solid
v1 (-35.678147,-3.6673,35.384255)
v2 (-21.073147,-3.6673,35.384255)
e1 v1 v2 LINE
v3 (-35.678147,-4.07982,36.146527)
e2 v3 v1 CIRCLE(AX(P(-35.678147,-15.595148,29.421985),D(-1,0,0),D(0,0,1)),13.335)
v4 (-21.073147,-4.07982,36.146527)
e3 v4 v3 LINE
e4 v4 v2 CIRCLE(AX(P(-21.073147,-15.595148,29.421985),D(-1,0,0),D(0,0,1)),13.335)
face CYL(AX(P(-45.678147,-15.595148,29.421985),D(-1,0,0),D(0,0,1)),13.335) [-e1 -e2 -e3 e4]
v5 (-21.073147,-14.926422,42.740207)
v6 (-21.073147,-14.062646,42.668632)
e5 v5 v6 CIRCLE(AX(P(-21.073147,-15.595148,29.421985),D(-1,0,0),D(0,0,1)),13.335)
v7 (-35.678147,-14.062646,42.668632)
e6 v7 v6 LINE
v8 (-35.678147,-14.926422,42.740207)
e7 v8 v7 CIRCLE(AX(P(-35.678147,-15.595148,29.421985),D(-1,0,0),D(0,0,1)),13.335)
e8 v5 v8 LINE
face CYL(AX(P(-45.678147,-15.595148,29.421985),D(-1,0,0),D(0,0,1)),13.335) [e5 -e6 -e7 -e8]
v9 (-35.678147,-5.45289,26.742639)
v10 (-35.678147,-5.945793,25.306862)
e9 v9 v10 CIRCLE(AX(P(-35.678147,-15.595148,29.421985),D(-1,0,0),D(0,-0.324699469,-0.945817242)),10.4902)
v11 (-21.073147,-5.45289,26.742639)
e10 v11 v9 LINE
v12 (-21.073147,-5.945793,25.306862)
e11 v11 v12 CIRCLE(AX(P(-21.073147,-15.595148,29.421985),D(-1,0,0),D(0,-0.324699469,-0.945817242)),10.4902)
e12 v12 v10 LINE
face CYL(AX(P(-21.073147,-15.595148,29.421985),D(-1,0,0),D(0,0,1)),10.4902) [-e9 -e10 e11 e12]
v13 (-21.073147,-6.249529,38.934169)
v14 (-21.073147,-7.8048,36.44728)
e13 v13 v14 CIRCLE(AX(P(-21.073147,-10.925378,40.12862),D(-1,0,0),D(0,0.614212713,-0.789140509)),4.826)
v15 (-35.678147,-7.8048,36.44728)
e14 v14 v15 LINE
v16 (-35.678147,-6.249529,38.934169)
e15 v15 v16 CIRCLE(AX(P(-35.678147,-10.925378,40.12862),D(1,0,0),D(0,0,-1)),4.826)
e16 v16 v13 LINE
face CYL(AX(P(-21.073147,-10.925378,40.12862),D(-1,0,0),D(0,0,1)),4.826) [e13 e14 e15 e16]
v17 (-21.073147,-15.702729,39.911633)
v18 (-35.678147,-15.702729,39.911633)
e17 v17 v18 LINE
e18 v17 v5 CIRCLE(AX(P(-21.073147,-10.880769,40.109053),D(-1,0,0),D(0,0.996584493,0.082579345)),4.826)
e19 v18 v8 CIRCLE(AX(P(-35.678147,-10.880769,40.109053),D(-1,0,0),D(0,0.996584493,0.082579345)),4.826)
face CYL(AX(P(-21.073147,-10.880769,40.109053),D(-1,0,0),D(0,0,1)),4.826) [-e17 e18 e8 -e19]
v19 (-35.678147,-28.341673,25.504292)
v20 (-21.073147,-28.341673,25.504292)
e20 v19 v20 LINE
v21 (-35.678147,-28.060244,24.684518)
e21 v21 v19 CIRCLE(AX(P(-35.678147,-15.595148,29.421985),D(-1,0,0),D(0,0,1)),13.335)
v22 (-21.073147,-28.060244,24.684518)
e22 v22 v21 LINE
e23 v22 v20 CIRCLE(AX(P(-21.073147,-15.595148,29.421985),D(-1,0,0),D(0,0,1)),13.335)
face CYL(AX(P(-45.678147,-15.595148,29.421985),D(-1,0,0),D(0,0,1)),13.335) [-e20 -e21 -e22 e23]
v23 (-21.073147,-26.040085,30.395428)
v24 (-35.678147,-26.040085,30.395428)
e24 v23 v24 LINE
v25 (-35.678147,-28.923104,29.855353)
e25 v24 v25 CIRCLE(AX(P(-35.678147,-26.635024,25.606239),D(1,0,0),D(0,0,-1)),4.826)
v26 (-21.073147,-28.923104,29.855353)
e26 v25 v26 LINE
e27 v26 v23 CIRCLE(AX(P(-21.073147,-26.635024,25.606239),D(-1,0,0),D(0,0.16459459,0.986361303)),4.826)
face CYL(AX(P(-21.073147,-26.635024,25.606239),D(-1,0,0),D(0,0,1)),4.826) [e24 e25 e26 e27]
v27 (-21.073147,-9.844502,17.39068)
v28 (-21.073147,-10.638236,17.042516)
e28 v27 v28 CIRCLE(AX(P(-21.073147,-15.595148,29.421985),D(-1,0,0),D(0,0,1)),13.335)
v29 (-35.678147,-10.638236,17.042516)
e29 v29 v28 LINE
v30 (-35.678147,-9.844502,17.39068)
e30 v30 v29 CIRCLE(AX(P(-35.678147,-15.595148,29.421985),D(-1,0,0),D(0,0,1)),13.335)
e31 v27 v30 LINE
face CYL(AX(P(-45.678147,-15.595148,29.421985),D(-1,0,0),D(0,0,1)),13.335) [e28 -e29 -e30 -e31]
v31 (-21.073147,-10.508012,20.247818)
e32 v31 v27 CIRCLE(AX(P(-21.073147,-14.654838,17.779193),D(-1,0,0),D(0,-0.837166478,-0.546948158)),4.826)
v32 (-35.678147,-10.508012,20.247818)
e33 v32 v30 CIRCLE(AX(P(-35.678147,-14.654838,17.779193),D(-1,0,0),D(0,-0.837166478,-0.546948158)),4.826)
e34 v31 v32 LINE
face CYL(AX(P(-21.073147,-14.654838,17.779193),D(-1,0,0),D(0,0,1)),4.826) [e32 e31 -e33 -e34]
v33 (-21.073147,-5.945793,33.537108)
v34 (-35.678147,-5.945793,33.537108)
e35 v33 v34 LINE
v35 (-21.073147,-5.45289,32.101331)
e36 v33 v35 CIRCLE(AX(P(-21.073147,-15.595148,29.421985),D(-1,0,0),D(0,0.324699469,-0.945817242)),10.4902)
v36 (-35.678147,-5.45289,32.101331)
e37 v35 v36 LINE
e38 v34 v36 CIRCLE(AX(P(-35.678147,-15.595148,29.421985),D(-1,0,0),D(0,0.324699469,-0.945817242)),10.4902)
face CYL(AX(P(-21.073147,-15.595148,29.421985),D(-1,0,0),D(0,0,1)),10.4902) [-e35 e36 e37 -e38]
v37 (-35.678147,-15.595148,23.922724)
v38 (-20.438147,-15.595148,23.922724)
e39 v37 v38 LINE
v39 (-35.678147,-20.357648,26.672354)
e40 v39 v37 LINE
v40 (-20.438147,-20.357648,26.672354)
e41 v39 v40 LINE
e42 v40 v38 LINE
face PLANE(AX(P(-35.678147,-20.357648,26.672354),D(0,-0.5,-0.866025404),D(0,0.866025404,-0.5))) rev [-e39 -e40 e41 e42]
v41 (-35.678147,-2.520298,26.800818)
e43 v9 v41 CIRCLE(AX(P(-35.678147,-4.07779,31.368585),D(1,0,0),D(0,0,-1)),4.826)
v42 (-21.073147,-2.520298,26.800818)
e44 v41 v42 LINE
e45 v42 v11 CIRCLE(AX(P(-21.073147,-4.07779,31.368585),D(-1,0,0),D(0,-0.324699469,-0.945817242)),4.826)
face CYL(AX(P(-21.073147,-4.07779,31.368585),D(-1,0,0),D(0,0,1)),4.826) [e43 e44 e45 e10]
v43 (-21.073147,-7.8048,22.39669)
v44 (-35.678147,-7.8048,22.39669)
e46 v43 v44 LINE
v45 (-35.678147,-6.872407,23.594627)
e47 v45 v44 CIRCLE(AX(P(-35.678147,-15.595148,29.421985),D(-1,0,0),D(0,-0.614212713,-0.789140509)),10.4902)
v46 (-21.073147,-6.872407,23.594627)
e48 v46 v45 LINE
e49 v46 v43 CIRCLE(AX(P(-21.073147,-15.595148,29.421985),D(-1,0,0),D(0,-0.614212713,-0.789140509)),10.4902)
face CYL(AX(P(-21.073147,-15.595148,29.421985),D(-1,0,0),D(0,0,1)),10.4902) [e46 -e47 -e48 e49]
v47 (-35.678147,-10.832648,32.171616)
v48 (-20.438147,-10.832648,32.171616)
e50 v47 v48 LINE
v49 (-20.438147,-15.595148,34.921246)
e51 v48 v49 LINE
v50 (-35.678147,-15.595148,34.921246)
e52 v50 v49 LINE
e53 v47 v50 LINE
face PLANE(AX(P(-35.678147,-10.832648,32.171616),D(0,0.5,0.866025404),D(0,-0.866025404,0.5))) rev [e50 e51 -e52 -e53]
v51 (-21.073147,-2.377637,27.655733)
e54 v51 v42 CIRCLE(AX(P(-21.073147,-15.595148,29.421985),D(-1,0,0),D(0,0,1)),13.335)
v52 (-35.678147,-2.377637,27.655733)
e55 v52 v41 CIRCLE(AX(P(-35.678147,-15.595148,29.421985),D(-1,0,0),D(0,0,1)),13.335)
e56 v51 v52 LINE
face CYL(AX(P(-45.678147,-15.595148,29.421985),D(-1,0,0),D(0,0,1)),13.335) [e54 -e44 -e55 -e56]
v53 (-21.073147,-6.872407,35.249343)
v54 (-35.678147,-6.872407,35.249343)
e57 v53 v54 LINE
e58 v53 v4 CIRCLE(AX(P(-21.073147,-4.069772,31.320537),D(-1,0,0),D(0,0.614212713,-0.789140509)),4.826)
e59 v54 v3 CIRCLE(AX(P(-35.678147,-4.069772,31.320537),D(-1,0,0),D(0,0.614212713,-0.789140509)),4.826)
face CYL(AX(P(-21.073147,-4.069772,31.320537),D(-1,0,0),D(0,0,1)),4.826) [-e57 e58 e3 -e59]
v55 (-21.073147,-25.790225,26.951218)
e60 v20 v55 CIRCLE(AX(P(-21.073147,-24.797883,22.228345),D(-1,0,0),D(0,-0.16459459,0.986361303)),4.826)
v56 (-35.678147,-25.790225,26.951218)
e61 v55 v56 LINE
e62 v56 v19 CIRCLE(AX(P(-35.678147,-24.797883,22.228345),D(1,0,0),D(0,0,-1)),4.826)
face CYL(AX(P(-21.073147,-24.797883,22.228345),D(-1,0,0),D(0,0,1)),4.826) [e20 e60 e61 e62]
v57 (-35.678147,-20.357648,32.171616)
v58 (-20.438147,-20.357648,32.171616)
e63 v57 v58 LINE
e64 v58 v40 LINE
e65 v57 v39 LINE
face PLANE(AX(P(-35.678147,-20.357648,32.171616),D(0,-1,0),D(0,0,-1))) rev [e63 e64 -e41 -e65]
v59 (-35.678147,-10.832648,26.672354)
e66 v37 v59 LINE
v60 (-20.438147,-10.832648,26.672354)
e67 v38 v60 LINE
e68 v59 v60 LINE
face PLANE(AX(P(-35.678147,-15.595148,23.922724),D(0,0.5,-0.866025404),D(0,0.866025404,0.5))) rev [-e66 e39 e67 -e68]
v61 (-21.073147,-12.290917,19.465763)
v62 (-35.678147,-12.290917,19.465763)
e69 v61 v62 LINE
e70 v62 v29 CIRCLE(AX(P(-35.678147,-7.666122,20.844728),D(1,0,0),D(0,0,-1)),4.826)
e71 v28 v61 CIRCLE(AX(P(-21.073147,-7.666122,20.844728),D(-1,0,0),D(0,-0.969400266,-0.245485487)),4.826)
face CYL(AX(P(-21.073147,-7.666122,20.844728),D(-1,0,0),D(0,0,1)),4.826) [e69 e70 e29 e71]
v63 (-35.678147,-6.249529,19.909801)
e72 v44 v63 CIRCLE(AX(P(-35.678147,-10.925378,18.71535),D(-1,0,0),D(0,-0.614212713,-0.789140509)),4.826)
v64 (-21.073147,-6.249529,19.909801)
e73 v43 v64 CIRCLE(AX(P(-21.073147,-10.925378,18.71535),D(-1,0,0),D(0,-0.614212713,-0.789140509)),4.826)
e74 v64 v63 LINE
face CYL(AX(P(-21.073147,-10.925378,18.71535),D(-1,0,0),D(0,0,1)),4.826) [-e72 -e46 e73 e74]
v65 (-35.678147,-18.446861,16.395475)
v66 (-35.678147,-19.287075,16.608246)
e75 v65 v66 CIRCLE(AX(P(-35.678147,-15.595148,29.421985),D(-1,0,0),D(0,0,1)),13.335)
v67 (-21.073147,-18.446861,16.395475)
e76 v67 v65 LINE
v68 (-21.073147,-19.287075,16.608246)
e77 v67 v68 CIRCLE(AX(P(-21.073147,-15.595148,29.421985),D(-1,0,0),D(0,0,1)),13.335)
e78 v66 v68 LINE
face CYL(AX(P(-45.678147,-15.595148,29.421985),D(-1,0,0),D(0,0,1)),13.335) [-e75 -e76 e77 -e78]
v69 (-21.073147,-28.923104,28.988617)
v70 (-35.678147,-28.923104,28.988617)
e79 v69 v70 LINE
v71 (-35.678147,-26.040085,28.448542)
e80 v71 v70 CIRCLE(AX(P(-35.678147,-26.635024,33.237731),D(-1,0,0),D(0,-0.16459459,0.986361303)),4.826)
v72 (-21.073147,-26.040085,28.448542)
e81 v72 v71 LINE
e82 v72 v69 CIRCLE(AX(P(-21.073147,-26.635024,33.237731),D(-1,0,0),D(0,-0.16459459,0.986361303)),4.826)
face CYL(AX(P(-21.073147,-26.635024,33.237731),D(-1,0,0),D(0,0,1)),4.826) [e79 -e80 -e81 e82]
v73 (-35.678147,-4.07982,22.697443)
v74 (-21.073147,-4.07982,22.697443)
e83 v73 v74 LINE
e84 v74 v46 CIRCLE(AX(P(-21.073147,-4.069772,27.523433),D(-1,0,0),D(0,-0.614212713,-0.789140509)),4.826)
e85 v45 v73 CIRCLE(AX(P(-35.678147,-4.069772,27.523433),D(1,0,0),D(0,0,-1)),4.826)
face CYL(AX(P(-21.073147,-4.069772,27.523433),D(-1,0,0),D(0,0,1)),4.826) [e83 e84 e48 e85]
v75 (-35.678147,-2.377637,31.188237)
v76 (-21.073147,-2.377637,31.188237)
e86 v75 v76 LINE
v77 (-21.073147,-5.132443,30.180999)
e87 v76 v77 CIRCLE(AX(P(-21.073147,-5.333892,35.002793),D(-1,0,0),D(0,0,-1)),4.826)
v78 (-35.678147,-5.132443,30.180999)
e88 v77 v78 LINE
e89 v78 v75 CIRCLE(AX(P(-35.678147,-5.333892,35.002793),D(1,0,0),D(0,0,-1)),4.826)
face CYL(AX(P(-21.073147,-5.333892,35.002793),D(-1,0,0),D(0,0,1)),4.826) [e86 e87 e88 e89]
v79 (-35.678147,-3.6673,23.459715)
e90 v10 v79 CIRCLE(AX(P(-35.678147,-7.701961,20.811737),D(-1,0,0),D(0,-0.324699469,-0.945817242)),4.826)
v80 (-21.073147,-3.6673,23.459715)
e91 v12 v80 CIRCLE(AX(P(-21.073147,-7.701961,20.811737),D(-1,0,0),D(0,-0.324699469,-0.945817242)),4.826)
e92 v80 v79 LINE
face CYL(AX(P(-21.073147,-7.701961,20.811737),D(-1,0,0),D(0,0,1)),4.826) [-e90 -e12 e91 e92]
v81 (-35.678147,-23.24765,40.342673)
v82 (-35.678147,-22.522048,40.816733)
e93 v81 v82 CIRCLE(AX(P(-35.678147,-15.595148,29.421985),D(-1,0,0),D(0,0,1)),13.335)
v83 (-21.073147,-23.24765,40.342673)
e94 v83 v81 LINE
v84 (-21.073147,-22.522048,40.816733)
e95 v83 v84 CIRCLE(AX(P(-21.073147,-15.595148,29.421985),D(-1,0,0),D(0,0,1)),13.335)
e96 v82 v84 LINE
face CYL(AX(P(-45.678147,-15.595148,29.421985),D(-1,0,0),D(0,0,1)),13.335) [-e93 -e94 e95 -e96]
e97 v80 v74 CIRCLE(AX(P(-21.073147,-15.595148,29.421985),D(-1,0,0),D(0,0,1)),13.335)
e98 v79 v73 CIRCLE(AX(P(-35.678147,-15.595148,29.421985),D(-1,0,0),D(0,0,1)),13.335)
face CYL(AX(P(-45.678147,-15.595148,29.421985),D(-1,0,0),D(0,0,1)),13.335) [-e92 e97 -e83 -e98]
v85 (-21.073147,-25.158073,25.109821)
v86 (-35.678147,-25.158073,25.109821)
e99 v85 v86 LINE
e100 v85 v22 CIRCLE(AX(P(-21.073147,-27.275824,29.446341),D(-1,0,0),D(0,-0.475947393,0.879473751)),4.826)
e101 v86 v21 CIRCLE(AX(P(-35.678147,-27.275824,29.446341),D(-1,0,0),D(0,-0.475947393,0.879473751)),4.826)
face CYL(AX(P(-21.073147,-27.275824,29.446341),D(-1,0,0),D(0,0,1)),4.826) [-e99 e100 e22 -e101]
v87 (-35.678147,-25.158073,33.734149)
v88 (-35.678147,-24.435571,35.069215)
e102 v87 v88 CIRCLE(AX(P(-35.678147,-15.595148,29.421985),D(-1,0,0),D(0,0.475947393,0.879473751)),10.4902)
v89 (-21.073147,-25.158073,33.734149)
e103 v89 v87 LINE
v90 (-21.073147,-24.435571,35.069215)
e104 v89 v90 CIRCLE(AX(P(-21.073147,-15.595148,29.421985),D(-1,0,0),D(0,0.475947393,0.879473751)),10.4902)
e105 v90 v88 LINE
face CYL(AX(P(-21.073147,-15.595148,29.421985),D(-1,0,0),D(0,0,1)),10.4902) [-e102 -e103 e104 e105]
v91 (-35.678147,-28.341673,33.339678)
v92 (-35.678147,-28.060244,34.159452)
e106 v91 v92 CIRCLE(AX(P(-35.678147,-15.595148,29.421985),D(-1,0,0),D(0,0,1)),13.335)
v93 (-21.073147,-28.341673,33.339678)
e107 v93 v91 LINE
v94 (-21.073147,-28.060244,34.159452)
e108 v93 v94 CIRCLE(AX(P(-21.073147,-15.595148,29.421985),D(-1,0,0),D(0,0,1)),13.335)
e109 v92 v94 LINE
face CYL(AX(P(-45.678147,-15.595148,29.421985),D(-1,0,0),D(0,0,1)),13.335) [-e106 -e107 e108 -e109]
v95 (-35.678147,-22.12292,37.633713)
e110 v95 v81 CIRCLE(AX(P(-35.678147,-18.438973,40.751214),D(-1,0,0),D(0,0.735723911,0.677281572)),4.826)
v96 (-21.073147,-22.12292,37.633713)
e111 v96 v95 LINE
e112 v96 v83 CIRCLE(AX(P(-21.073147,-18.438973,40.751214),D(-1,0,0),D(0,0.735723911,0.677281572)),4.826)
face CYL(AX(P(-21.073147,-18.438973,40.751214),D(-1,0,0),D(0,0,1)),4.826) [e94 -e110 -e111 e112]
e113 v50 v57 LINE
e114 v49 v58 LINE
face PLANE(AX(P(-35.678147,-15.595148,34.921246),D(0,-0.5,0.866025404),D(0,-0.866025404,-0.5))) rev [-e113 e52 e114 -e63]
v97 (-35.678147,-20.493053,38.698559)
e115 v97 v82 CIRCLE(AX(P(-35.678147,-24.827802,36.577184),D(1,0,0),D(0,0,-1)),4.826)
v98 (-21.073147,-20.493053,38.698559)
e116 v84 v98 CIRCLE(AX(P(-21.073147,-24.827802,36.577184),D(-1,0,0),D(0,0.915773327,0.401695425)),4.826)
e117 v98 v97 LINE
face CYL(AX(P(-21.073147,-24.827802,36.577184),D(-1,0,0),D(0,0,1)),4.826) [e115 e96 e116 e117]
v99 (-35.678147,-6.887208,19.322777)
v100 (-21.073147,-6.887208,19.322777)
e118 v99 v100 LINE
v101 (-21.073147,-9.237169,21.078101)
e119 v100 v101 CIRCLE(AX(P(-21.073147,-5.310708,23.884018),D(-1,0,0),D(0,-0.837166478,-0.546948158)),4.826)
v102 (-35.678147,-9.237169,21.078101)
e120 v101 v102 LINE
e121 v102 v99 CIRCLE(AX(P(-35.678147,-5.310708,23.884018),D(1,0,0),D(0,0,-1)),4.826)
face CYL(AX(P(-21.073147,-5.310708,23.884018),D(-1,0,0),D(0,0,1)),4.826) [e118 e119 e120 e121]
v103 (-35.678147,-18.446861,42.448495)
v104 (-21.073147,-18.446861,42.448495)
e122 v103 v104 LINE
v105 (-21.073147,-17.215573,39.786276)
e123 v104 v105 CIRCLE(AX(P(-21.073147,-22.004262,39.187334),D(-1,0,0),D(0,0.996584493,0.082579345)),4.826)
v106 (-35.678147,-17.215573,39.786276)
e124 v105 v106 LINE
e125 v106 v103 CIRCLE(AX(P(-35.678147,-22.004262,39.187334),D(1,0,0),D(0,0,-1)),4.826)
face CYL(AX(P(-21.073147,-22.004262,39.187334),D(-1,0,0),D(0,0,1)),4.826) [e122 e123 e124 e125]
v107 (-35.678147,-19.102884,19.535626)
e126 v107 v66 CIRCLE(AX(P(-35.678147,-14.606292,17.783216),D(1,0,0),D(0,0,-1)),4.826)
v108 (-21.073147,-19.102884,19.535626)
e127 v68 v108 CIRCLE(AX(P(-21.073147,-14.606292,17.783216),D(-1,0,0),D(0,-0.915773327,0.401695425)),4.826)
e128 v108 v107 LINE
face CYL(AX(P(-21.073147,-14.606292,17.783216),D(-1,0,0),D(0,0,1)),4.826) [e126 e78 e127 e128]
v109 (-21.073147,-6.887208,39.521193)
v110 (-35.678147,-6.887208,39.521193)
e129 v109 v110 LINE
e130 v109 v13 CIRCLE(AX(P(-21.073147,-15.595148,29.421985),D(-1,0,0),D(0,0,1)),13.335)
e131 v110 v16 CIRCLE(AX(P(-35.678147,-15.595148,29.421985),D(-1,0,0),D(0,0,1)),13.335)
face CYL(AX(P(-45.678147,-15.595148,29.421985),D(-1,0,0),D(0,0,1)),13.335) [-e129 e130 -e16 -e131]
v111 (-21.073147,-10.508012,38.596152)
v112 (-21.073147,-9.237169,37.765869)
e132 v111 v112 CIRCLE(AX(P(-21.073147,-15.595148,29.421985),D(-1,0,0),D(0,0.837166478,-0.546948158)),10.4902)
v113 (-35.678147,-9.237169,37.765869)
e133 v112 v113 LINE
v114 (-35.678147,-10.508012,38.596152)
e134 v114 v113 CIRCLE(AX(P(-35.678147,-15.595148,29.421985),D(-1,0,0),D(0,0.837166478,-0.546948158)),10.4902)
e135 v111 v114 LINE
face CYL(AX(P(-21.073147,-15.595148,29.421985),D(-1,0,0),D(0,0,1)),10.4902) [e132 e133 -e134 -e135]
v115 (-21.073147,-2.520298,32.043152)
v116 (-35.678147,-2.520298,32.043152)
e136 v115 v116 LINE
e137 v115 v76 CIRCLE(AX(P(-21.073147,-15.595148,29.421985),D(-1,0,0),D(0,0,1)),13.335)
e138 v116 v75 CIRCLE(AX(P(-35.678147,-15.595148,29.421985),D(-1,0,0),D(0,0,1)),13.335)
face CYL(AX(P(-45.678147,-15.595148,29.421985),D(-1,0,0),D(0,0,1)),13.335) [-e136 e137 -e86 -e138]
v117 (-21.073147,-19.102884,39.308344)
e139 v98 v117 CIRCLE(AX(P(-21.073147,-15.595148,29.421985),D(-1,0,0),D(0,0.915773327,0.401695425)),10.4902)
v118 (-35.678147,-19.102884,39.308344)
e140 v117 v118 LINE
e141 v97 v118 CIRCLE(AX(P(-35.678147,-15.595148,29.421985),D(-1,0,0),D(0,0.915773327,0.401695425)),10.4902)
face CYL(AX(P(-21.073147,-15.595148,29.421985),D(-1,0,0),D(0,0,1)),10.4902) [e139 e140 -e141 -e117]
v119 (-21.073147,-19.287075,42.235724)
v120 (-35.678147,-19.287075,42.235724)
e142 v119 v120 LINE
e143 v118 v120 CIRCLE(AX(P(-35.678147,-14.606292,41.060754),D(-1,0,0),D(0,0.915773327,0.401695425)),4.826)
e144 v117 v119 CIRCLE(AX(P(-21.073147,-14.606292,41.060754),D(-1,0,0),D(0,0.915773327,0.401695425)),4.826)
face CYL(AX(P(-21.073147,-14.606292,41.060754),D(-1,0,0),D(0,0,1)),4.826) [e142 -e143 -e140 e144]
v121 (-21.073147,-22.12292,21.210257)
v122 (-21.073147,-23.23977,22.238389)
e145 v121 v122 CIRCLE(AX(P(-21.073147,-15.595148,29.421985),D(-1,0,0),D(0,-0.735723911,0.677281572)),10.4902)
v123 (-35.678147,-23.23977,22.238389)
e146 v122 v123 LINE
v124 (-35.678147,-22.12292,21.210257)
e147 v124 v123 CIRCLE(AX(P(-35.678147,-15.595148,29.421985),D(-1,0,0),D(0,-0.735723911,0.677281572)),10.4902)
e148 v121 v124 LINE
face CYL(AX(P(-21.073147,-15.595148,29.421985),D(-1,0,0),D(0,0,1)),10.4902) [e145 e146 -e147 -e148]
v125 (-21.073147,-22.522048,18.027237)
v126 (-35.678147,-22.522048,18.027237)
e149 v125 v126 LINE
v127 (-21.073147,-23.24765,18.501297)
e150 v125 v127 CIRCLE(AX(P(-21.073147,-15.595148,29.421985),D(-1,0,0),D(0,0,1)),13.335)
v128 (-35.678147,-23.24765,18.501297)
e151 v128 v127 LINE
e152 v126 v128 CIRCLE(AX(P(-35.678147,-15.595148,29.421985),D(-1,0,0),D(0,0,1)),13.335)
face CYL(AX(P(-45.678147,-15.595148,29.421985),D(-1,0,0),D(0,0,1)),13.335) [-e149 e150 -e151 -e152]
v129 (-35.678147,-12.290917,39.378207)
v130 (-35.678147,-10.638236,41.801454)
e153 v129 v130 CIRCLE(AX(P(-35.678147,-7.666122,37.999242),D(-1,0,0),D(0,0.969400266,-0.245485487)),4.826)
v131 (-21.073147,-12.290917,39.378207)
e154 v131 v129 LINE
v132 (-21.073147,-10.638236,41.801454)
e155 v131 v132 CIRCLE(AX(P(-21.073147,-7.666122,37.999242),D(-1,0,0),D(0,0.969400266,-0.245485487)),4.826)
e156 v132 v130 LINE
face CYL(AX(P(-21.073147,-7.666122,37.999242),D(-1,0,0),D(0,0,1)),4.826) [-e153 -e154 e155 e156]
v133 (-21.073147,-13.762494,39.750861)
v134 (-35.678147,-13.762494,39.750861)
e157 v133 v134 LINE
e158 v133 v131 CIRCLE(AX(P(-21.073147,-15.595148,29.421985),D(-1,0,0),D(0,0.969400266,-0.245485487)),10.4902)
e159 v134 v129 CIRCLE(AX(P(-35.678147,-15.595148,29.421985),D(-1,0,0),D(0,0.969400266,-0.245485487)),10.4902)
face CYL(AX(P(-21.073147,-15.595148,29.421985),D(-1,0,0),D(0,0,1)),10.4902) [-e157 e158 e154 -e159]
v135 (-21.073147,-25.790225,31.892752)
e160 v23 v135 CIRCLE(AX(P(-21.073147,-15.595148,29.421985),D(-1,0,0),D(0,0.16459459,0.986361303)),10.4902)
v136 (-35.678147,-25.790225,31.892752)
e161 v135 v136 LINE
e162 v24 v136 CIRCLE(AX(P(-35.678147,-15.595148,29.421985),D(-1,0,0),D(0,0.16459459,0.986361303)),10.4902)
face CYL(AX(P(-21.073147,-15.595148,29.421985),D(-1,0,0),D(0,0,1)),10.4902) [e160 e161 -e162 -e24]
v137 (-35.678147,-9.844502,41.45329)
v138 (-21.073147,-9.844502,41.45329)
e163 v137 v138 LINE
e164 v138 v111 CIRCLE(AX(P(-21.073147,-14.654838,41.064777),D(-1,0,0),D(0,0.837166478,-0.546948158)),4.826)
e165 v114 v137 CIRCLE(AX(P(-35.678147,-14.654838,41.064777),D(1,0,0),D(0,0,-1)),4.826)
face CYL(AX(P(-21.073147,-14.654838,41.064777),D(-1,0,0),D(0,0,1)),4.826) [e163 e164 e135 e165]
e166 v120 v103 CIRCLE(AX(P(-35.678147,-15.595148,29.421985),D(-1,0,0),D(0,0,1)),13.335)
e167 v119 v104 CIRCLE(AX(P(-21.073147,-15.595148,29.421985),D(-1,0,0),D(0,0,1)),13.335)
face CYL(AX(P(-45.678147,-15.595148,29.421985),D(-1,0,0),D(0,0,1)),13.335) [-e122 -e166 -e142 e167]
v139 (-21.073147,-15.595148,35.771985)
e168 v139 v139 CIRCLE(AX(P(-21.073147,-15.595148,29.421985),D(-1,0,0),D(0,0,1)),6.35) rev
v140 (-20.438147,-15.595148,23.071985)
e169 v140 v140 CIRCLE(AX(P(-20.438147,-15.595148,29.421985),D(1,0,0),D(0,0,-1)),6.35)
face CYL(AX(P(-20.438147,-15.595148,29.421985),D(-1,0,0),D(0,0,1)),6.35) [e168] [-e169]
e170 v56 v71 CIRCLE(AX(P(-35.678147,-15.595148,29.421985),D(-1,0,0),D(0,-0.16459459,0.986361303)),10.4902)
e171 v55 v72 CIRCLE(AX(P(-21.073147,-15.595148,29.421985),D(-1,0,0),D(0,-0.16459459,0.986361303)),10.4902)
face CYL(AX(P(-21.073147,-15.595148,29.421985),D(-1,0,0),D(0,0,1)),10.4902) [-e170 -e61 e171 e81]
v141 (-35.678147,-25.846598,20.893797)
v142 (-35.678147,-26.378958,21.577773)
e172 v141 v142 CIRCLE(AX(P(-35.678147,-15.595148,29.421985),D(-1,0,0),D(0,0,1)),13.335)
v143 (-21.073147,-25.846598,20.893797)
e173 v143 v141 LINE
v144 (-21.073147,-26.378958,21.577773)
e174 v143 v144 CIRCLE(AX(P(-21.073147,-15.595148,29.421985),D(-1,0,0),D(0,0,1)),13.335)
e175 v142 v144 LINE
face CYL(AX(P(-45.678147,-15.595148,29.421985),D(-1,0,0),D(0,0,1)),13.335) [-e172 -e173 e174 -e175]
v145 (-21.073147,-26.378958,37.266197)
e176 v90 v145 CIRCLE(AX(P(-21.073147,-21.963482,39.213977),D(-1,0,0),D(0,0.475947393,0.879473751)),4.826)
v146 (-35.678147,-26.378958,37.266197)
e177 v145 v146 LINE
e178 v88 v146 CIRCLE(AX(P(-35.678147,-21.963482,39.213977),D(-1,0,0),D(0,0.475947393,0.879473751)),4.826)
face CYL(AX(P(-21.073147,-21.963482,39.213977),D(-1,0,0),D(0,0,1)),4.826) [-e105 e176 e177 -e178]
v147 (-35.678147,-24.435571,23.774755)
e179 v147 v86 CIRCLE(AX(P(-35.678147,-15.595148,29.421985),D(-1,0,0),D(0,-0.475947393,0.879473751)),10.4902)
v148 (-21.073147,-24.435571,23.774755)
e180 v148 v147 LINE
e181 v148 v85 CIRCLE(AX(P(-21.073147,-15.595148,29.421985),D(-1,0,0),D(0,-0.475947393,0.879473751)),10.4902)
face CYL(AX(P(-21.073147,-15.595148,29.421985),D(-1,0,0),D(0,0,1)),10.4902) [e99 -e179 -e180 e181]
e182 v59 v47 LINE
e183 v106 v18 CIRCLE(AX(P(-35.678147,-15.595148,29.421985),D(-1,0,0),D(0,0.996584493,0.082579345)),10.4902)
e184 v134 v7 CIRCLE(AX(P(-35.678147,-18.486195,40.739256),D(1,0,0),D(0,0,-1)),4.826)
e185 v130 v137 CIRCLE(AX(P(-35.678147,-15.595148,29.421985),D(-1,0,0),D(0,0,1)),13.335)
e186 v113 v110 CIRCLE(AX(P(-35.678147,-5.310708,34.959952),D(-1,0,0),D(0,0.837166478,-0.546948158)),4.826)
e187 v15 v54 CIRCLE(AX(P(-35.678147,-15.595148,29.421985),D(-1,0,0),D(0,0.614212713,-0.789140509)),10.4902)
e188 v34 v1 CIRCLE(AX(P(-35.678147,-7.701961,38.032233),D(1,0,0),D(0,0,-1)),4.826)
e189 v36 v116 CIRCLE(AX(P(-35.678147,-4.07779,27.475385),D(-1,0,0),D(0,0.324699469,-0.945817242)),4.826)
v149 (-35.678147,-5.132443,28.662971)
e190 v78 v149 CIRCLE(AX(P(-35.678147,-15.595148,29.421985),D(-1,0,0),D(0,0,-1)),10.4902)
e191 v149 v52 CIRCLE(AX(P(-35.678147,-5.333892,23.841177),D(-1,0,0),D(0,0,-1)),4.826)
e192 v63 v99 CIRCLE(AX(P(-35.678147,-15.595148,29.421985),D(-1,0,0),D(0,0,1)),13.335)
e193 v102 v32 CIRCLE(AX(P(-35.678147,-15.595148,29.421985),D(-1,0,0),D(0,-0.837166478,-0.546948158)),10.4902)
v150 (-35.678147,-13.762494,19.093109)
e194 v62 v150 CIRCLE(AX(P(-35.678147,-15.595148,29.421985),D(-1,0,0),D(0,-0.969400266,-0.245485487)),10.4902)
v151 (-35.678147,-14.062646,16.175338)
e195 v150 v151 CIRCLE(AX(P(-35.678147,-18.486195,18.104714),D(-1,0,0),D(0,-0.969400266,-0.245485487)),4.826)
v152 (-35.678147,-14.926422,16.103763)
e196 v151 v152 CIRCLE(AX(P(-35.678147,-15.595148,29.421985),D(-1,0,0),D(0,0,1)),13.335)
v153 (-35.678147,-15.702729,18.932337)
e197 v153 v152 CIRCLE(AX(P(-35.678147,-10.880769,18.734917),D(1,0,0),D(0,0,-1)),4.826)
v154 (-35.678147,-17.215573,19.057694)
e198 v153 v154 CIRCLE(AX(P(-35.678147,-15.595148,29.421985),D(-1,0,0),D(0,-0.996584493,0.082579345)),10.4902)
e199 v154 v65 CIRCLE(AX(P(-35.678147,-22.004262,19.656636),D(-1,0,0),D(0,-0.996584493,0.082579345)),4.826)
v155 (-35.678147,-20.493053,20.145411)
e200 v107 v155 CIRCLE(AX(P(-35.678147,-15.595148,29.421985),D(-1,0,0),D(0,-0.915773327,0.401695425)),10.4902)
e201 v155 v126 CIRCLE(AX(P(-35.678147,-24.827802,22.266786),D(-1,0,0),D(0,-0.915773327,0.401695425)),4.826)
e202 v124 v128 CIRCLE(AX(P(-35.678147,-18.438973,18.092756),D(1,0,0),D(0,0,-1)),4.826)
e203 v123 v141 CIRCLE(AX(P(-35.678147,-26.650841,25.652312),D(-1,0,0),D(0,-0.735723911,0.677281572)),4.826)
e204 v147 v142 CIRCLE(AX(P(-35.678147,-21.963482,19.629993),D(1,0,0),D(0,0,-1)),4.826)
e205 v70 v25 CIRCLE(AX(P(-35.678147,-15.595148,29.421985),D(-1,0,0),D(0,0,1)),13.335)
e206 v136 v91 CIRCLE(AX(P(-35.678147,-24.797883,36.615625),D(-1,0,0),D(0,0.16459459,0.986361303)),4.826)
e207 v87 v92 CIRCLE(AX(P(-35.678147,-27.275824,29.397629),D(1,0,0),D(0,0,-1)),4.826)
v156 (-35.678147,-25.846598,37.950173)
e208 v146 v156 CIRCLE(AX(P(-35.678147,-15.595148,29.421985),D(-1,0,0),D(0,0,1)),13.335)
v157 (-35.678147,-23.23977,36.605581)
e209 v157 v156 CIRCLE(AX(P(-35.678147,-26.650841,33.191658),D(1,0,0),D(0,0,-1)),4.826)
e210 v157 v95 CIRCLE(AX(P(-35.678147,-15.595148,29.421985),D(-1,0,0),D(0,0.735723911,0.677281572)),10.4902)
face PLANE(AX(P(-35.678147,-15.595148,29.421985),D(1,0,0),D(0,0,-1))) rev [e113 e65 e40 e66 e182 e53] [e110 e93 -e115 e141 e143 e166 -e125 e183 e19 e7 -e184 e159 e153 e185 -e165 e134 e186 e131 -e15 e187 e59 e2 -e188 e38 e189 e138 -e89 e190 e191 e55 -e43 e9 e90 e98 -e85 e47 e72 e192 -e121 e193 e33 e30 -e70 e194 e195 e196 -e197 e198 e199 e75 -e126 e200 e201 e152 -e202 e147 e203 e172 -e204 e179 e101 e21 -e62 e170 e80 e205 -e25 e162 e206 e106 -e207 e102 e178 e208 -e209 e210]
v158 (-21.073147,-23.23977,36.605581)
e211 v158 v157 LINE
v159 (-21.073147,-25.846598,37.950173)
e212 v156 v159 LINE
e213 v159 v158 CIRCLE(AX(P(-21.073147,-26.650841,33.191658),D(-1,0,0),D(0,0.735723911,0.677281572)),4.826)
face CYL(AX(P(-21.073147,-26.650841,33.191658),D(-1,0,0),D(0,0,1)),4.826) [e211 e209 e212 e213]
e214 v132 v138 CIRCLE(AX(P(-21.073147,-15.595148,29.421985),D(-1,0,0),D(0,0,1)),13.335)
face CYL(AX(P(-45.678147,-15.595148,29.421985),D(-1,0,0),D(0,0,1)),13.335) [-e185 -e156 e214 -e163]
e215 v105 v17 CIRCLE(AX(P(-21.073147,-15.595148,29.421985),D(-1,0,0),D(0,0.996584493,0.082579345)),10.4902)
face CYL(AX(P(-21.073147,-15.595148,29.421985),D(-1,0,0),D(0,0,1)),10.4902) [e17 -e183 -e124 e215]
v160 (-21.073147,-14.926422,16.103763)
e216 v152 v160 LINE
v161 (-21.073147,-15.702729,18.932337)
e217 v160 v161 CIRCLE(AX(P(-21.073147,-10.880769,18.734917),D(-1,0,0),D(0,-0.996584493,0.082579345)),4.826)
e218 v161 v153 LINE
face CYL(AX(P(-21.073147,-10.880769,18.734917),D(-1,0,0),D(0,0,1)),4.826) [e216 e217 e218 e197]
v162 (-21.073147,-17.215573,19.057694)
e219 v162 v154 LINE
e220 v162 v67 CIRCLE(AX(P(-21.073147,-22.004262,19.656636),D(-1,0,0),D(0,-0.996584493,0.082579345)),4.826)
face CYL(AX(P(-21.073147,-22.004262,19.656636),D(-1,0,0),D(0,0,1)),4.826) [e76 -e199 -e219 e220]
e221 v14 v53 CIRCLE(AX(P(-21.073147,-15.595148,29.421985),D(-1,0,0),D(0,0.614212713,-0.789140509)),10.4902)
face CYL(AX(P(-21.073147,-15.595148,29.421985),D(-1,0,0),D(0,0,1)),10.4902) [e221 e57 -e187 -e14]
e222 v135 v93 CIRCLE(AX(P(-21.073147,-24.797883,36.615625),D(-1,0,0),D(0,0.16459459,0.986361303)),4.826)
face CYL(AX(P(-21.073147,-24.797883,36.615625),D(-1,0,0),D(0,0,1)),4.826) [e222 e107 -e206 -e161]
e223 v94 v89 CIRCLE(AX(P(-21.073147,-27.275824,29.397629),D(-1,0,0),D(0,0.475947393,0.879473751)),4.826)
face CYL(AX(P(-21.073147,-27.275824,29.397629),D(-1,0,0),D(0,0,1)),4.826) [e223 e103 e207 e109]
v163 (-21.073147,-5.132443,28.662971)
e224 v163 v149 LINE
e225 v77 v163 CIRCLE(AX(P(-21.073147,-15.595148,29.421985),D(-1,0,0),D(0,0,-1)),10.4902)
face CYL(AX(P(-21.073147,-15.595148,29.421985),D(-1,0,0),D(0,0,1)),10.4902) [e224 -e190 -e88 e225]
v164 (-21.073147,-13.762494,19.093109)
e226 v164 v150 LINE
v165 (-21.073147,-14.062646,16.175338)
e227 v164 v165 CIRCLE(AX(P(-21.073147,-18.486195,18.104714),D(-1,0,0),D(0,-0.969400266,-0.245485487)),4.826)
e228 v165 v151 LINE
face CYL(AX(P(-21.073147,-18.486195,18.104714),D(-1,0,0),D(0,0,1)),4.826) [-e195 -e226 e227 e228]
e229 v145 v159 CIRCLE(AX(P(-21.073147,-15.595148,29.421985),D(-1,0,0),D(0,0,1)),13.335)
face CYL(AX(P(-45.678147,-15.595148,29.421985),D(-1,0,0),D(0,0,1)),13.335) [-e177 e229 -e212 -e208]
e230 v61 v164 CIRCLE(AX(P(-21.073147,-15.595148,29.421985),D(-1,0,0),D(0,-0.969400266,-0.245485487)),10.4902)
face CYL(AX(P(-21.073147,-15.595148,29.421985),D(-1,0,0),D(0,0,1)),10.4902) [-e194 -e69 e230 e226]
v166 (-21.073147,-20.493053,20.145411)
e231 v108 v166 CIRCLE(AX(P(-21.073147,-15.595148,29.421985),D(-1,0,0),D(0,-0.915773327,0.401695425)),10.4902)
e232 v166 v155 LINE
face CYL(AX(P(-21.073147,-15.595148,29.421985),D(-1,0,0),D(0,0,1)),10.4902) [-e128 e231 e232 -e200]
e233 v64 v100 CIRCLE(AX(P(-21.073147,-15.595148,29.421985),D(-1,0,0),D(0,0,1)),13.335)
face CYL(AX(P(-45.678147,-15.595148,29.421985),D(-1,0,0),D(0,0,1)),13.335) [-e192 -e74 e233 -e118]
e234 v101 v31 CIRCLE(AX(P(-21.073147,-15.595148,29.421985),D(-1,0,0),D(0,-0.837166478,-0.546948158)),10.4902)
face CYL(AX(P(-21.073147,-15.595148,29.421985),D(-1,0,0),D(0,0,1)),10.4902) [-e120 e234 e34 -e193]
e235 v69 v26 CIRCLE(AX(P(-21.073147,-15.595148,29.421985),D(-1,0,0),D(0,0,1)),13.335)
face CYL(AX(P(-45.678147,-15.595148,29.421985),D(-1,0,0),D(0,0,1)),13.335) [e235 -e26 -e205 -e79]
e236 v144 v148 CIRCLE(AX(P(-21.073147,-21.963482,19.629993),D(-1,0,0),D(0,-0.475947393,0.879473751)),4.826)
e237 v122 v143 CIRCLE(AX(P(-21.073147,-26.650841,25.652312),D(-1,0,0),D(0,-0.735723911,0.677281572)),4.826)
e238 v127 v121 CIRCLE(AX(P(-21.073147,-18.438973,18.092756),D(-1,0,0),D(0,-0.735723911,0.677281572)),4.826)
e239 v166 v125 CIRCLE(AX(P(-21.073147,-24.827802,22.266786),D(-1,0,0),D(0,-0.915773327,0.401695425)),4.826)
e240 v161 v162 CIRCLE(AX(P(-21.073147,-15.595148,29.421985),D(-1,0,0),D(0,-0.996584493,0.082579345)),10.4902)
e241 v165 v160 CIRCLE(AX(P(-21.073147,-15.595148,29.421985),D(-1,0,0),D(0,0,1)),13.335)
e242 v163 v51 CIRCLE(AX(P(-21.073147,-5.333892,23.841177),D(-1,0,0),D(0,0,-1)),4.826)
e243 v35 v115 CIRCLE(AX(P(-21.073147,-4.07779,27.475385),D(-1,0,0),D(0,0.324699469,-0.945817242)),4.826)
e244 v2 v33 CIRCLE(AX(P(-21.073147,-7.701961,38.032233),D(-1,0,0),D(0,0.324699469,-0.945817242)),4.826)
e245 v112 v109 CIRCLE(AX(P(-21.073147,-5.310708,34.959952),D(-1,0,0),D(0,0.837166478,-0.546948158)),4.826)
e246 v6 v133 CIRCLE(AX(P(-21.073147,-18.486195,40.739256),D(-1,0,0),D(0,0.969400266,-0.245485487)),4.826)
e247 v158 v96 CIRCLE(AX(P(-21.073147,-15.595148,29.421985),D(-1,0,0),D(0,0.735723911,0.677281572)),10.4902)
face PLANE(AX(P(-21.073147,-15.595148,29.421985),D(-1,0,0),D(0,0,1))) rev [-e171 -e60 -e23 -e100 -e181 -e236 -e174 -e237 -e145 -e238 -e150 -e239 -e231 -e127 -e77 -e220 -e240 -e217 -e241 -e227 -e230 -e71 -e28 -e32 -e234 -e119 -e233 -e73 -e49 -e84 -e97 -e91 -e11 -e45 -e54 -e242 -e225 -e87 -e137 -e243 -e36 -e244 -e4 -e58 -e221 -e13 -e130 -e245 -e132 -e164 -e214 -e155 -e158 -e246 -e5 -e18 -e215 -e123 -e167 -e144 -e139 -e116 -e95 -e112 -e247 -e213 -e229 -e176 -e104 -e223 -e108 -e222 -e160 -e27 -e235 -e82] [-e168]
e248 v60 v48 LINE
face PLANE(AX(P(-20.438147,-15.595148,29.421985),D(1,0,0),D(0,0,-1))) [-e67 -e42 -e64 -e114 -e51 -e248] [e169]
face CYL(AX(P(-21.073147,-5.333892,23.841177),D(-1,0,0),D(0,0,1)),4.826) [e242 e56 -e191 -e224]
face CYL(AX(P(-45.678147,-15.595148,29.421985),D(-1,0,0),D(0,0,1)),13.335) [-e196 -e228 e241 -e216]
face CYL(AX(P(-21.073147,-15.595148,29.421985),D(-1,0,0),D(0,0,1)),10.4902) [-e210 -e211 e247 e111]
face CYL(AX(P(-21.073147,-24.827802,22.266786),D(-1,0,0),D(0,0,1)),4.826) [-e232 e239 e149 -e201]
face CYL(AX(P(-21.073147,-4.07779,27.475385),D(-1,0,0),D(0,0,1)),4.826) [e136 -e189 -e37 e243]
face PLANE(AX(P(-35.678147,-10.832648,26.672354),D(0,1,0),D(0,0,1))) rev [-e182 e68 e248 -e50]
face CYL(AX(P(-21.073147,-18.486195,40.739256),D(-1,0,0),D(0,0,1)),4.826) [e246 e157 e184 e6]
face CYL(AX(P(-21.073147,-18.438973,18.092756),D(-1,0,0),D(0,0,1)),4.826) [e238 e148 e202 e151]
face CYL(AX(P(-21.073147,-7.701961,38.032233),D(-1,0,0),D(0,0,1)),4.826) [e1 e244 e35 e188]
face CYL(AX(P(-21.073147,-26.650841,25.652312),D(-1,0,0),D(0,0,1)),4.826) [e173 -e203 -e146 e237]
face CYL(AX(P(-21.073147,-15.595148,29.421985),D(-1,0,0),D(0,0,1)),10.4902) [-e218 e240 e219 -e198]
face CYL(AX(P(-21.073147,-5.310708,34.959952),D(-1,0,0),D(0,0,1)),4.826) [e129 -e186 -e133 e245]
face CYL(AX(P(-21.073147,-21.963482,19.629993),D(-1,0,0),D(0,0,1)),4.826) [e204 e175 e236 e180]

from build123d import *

# Parameters (mm, degrees)
SPUR_START             = -35.678146729
SPUR_GEAR_AI_OUTLINE_R = 4.7625
SPUR_GEAR_AI_DEPTH     = 14.605
SKETCH1_R              = 6.35
BOSS_EXTRUDE1_DEPTH    = 0.635
CUT_EXTRUDE1_DEPTH     = 54.813904544


# Read off the part's stored shape, not the designer's step: spur gear_ai
with BuildPart() as part:
    # spur gear_ai outline → spur gear_ai (new body)
    with BuildSketch(Plane.YZ.offset(SPUR_START)):
        with BuildLine():
            ThreePointArc((-4.079820471, 22.697443218), (-3.867365299, 23.075226512), (-3.667299754, 23.459714736))
            ThreePointArc((-3.667299754, 23.459714736), (-4.662813868, 24.560584868), (-5.94579254, 25.306861711))
            ThreePointArc((-5.94579254, 25.306861711), (-5.673335743, 26.015822626), (-5.452889632, 26.742638832))
            ThreePointArc((-5.452889632, 26.742638832), (-3.982066465, 26.54353431), (-2.52029752, 26.800818102))
            ThreePointArc((-2.52029752, 26.800818102), (-2.442019791, 27.227116136), (-2.377637471, 27.655732904))
            ThreePointArc((-2.377637471, 27.655732904), (-3.676663832, 28.373711952), (-5.132442876, 28.662970963))
            ThreePointArc((-5.132442876, 28.662970963), (-5.104947771, 29.421984997), (-5.132442876, 30.180999032))
            ThreePointArc((-5.132442876, 30.180999032), (-3.676663832, 30.470258044), (-2.377637471, 31.188237091))
            ThreePointArc((-2.377637471, 31.188237091), (-2.442019791, 31.616853859), (-2.52029752, 32.043151894))
            ThreePointArc((-2.52029752, 32.043151894), (-3.982066465, 32.300435686), (-5.452889632, 32.101331163))
            ThreePointArc((-5.452889632, 32.101331163), (-5.673335743, 32.82814737), (-5.94579254, 33.537108285))
            ThreePointArc((-5.94579254, 33.537108285), (-4.662813868, 34.283385128), (-3.667299754, 35.38425526))
            ThreePointArc((-3.667299754, 35.38425526), (-3.867365299, 35.768743484), (-4.079820471, 36.146526778))
            ThreePointArc((-4.079820471, 36.146526778), (-5.545926653, 35.915234624), (-6.872407431, 35.249342632))
            ThreePointArc((-6.872407431, 35.249342632), (-7.316906, 35.865199196), (-7.80479957, 36.447280076))
            ThreePointArc((-7.80479957, 36.447280076), (-6.833651916, 37.569704075), (-6.24952945, 38.934168931))
            ThreePointArc((-6.24952945, 38.934168931), (-6.563598014, 39.232863347), (-6.887207813, 39.521193218))
            ThreePointArc((-6.887207813, 39.521193218), (-8.198775879, 38.826389212), (-9.237169493, 37.76586948))
            ThreePointArc((-9.237169493, 37.76586948), (-9.857552203, 38.204028788), (-10.508011706, 38.596152137))
            ThreePointArc((-10.508011706, 38.596152137), (-9.953933988, 39.973091236), (-9.844501902, 41.453289877))
            ThreePointArc((-9.844501902, 41.453289877), (-10.238539284, 41.633822309), (-10.638235568, 41.801453743))
            ThreePointArc((-10.638235568, 41.801453743), (-11.653136766, 40.718430679), (-12.290917156, 39.378206976))
            ThreePointArc((-12.290917156, 39.378206976), (-13.019955914, 39.591187668), (-13.76249397, 39.750860836))
            ThreePointArc((-13.76249397, 39.750860836), (-13.685529105, 41.233102318), (-14.062646066, 42.668632254))
            ThreePointArc((-14.062646066, 42.668632254), (-14.4939522, 42.711439212), (-14.926421674, 42.740206741))
            ThreePointArc((-14.926421674, 42.740206741), (-15.534675712, 41.386326974), (-15.702729477, 39.911633334))
            ThreePointArc((-15.702729477, 39.911633334), (-16.461421622, 39.876355646), (-17.215572711, 39.78627557))
            ThreePointArc((-17.215572711, 39.78627557), (-17.624061036, 41.21319557), (-18.446860568, 42.448494858))
            ThreePointArc((-18.446860568, 42.448494858), (-18.868696742, 42.348937544), (-19.287074629, 42.23572376))
            ThreePointArc((-19.287074629, 42.23572376), (-19.422767744, 40.75770117), (-19.10288365, 39.308343531))
            ThreePointArc((-19.10288365, 39.308343531), (-19.809013115, 39.028630349), (-20.493053265, 38.698558601))
            ThreePointArc((-20.493053265, 38.698558601), (-21.342728733, 39.915528197), (-22.52204774, 40.816732991))
            ThreePointArc((-22.52204774, 40.816732991), (-22.88870146, 40.585599985), (-23.247650023, 40.342673359))
            ThreePointArc((-23.247650023, 40.342673359), (-22.89607776, 38.900674627), (-22.122920213, 37.633713378))
            ThreePointArc((-22.122920213, 37.633713378), (-22.699966914, 37.139875965), (-23.239769761, 36.605580942))
            ThreePointArc((-23.239769761, 36.605580942), (-24.43855685, 37.480722595), (-25.846597818, 37.950173372))
            ThreePointArc((-25.846597818, 37.950173372), (-26.118336464, 37.612511521), (-26.378958058, 37.266196922))
            ThreePointArc((-26.378958058, 37.266196922), (-25.578218727, 36.016484986), (-24.435571343, 35.069215037))
            ThreePointArc((-24.435571343, 35.069215037), (-24.821003316, 34.41476834), (-25.158072845, 33.734149197))
            ThreePointArc((-25.158072845, 33.734149197), (-26.576064374, 34.172627729), (-28.060244216, 34.159452214))
            ThreePointArc((-28.060244216, 34.159452214), (-28.20762069, 33.75185242), (-28.34167292, 33.339678407))
            ThreePointArc((-28.34167292, 33.339678407), (-27.178539052, 32.417678947), (-25.790225405, 31.892751696))
            ThreePointArc((-25.790225405, 31.892751696), (-25.942275116, 31.148615169), (-26.040084614, 30.395427551))
            ThreePointArc((-26.040084614, 30.395427551), (-27.523619197, 30.34972701), (-28.923103999, 29.855352973))
            ThreePointArc((-28.923103999, 29.855352973), (-28.930147771, 29.421984997), (-28.923103999, 28.988617022))
            ThreePointArc((-28.923103999, 28.988617022), (-27.523619197, 28.494242985), (-26.040084614, 28.448542445))
            ThreePointArc((-26.040084614, 28.448542445), (-25.942275116, 27.695354827), (-25.790225405, 26.9512183))
            ThreePointArc((-25.790225405, 26.9512183), (-27.178539052, 26.426291049), (-28.34167292, 25.504291588))
            ThreePointArc((-28.34167292, 25.504291588), (-28.20762069, 25.092117576), (-28.060244216, 24.684517782))
            ThreePointArc((-28.060244216, 24.684517782), (-26.576064374, 24.671342266), (-25.158072845, 25.109820799))
            ThreePointArc((-25.158072845, 25.109820799), (-24.821003316, 24.429201655), (-24.435571343, 23.774754958))
            ThreePointArc((-24.435571343, 23.774754958), (-25.578218727, 22.82748501), (-26.378958058, 21.577773074))
            ThreePointArc((-26.378958058, 21.577773074), (-26.118336464, 21.231458474), (-25.846597818, 20.893796624))
            ThreePointArc((-25.846597818, 20.893796624), (-24.43855685, 21.363247401), (-23.239769761, 22.238389054))
            ThreePointArc((-23.239769761, 22.238389054), (-22.699966914, 21.70409403), (-22.122920213, 21.210256617))
            ThreePointArc((-22.122920213, 21.210256617), (-22.89607776, 19.943295369), (-23.247650023, 18.501296637))
            ThreePointArc((-23.247650023, 18.501296637), (-22.88870146, 18.25837001), (-22.52204774, 18.027237004))
            ThreePointArc((-22.52204774, 18.027237004), (-21.342728733, 18.928441798), (-20.493053265, 20.145411395))
            ThreePointArc((-20.493053265, 20.145411395), (-19.809013115, 19.815339646), (-19.10288365, 19.535626465))
            ThreePointArc((-19.10288365, 19.535626465), (-19.422767744, 18.086268826), (-19.287074629, 16.608246235))
            ThreePointArc((-19.287074629, 16.608246235), (-18.868696743, 16.495032451), (-18.446860568, 16.395475138))
            ThreePointArc((-18.446860568, 16.395475138), (-17.624061036, 17.630774426), (-17.215572711, 19.057694426))
            ThreePointArc((-17.215572711, 19.057694426), (-16.461421622, 18.967614349), (-15.702729477, 18.932336662))
            ThreePointArc((-15.702729477, 18.932336662), (-15.534675712, 17.457643022), (-14.926421674, 16.103763254))
            ThreePointArc((-14.926421674, 16.103763254), (-14.4939522, 16.132530784), (-14.062646066, 16.175337742))
            ThreePointArc((-14.062646066, 16.175337742), (-13.685529105, 17.610867678), (-13.76249397, 19.093109159))
            ThreePointArc((-13.76249397, 19.093109159), (-13.019955914, 19.252782328), (-12.290917156, 19.465763019))
            ThreePointArc((-12.290917156, 19.465763019), (-11.653136766, 18.125539317), (-10.638235568, 17.042516253))
            ThreePointArc((-10.638235568, 17.042516253), (-10.238539284, 17.210147687), (-9.844501902, 17.390680119))
            ThreePointArc((-9.844501902, 17.390680119), (-9.953933988, 18.87087876), (-10.508011706, 20.247817859))
            ThreePointArc((-10.508011706, 20.247817859), (-9.857552203, 20.639941207), (-9.237169493, 21.078100515))
            ThreePointArc((-9.237169493, 21.078100515), (-8.198775879, 20.017580784), (-6.887207813, 19.322776777))
            ThreePointArc((-6.887207813, 19.322776777), (-6.563598014, 19.611106649), (-6.24952945, 19.909801064))
            ThreePointArc((-6.24952945, 19.909801064), (-6.833651916, 21.274265921), (-7.80479957, 22.39668992))
            ThreePointArc((-7.80479957, 22.39668992), (-7.316906, 22.978770799), (-6.872407431, 23.594627364))
            ThreePointArc((-6.872407431, 23.594627364), (-5.545926653, 22.928735372), (-4.079820471, 22.697443218))
        make_face()
        with Locations((-15.595147771, 29.421984998)):
            Circle(SPUR_GEAR_AI_OUTLINE_R, mode=Mode.SUBTRACT)
    extrude(amount=SPUR_GEAR_AI_DEPTH)

    # Sketch1 → Boss-Extrude1 (add)
    with BuildSketch(Plane(origin=(-21.073146729, 0, 0), x_dir=(0, 0, -1), z_dir=(1, 0, 0))):
        with Locations(Location((-29.421984998, -15.595147771, 0), (0, 0, 180))):
            Circle(SKETCH1_R)
    extrude(amount=BOSS_EXTRUDE1_DEPTH)

    # Sketch2 → Cut-Extrude1 (cut, through all)
    with BuildSketch(Plane(origin=(-20.438146729, 0, 0), x_dir=(0, 0, -1), z_dir=(1, 0, 0))):
        Polygon((-26.672354341, -10.832647771), (-32.171615655, -10.832647771), (-34.921246312, -15.595147771), (-32.171615655, -20.357647771), (-26.672354341, -20.357647771), (-23.922723684, -15.595147771), align=None)
    extrude(amount=-CUT_EXTRUDE1_DEPTH, mode=Mode.SUBTRACT)


solid = part.part
